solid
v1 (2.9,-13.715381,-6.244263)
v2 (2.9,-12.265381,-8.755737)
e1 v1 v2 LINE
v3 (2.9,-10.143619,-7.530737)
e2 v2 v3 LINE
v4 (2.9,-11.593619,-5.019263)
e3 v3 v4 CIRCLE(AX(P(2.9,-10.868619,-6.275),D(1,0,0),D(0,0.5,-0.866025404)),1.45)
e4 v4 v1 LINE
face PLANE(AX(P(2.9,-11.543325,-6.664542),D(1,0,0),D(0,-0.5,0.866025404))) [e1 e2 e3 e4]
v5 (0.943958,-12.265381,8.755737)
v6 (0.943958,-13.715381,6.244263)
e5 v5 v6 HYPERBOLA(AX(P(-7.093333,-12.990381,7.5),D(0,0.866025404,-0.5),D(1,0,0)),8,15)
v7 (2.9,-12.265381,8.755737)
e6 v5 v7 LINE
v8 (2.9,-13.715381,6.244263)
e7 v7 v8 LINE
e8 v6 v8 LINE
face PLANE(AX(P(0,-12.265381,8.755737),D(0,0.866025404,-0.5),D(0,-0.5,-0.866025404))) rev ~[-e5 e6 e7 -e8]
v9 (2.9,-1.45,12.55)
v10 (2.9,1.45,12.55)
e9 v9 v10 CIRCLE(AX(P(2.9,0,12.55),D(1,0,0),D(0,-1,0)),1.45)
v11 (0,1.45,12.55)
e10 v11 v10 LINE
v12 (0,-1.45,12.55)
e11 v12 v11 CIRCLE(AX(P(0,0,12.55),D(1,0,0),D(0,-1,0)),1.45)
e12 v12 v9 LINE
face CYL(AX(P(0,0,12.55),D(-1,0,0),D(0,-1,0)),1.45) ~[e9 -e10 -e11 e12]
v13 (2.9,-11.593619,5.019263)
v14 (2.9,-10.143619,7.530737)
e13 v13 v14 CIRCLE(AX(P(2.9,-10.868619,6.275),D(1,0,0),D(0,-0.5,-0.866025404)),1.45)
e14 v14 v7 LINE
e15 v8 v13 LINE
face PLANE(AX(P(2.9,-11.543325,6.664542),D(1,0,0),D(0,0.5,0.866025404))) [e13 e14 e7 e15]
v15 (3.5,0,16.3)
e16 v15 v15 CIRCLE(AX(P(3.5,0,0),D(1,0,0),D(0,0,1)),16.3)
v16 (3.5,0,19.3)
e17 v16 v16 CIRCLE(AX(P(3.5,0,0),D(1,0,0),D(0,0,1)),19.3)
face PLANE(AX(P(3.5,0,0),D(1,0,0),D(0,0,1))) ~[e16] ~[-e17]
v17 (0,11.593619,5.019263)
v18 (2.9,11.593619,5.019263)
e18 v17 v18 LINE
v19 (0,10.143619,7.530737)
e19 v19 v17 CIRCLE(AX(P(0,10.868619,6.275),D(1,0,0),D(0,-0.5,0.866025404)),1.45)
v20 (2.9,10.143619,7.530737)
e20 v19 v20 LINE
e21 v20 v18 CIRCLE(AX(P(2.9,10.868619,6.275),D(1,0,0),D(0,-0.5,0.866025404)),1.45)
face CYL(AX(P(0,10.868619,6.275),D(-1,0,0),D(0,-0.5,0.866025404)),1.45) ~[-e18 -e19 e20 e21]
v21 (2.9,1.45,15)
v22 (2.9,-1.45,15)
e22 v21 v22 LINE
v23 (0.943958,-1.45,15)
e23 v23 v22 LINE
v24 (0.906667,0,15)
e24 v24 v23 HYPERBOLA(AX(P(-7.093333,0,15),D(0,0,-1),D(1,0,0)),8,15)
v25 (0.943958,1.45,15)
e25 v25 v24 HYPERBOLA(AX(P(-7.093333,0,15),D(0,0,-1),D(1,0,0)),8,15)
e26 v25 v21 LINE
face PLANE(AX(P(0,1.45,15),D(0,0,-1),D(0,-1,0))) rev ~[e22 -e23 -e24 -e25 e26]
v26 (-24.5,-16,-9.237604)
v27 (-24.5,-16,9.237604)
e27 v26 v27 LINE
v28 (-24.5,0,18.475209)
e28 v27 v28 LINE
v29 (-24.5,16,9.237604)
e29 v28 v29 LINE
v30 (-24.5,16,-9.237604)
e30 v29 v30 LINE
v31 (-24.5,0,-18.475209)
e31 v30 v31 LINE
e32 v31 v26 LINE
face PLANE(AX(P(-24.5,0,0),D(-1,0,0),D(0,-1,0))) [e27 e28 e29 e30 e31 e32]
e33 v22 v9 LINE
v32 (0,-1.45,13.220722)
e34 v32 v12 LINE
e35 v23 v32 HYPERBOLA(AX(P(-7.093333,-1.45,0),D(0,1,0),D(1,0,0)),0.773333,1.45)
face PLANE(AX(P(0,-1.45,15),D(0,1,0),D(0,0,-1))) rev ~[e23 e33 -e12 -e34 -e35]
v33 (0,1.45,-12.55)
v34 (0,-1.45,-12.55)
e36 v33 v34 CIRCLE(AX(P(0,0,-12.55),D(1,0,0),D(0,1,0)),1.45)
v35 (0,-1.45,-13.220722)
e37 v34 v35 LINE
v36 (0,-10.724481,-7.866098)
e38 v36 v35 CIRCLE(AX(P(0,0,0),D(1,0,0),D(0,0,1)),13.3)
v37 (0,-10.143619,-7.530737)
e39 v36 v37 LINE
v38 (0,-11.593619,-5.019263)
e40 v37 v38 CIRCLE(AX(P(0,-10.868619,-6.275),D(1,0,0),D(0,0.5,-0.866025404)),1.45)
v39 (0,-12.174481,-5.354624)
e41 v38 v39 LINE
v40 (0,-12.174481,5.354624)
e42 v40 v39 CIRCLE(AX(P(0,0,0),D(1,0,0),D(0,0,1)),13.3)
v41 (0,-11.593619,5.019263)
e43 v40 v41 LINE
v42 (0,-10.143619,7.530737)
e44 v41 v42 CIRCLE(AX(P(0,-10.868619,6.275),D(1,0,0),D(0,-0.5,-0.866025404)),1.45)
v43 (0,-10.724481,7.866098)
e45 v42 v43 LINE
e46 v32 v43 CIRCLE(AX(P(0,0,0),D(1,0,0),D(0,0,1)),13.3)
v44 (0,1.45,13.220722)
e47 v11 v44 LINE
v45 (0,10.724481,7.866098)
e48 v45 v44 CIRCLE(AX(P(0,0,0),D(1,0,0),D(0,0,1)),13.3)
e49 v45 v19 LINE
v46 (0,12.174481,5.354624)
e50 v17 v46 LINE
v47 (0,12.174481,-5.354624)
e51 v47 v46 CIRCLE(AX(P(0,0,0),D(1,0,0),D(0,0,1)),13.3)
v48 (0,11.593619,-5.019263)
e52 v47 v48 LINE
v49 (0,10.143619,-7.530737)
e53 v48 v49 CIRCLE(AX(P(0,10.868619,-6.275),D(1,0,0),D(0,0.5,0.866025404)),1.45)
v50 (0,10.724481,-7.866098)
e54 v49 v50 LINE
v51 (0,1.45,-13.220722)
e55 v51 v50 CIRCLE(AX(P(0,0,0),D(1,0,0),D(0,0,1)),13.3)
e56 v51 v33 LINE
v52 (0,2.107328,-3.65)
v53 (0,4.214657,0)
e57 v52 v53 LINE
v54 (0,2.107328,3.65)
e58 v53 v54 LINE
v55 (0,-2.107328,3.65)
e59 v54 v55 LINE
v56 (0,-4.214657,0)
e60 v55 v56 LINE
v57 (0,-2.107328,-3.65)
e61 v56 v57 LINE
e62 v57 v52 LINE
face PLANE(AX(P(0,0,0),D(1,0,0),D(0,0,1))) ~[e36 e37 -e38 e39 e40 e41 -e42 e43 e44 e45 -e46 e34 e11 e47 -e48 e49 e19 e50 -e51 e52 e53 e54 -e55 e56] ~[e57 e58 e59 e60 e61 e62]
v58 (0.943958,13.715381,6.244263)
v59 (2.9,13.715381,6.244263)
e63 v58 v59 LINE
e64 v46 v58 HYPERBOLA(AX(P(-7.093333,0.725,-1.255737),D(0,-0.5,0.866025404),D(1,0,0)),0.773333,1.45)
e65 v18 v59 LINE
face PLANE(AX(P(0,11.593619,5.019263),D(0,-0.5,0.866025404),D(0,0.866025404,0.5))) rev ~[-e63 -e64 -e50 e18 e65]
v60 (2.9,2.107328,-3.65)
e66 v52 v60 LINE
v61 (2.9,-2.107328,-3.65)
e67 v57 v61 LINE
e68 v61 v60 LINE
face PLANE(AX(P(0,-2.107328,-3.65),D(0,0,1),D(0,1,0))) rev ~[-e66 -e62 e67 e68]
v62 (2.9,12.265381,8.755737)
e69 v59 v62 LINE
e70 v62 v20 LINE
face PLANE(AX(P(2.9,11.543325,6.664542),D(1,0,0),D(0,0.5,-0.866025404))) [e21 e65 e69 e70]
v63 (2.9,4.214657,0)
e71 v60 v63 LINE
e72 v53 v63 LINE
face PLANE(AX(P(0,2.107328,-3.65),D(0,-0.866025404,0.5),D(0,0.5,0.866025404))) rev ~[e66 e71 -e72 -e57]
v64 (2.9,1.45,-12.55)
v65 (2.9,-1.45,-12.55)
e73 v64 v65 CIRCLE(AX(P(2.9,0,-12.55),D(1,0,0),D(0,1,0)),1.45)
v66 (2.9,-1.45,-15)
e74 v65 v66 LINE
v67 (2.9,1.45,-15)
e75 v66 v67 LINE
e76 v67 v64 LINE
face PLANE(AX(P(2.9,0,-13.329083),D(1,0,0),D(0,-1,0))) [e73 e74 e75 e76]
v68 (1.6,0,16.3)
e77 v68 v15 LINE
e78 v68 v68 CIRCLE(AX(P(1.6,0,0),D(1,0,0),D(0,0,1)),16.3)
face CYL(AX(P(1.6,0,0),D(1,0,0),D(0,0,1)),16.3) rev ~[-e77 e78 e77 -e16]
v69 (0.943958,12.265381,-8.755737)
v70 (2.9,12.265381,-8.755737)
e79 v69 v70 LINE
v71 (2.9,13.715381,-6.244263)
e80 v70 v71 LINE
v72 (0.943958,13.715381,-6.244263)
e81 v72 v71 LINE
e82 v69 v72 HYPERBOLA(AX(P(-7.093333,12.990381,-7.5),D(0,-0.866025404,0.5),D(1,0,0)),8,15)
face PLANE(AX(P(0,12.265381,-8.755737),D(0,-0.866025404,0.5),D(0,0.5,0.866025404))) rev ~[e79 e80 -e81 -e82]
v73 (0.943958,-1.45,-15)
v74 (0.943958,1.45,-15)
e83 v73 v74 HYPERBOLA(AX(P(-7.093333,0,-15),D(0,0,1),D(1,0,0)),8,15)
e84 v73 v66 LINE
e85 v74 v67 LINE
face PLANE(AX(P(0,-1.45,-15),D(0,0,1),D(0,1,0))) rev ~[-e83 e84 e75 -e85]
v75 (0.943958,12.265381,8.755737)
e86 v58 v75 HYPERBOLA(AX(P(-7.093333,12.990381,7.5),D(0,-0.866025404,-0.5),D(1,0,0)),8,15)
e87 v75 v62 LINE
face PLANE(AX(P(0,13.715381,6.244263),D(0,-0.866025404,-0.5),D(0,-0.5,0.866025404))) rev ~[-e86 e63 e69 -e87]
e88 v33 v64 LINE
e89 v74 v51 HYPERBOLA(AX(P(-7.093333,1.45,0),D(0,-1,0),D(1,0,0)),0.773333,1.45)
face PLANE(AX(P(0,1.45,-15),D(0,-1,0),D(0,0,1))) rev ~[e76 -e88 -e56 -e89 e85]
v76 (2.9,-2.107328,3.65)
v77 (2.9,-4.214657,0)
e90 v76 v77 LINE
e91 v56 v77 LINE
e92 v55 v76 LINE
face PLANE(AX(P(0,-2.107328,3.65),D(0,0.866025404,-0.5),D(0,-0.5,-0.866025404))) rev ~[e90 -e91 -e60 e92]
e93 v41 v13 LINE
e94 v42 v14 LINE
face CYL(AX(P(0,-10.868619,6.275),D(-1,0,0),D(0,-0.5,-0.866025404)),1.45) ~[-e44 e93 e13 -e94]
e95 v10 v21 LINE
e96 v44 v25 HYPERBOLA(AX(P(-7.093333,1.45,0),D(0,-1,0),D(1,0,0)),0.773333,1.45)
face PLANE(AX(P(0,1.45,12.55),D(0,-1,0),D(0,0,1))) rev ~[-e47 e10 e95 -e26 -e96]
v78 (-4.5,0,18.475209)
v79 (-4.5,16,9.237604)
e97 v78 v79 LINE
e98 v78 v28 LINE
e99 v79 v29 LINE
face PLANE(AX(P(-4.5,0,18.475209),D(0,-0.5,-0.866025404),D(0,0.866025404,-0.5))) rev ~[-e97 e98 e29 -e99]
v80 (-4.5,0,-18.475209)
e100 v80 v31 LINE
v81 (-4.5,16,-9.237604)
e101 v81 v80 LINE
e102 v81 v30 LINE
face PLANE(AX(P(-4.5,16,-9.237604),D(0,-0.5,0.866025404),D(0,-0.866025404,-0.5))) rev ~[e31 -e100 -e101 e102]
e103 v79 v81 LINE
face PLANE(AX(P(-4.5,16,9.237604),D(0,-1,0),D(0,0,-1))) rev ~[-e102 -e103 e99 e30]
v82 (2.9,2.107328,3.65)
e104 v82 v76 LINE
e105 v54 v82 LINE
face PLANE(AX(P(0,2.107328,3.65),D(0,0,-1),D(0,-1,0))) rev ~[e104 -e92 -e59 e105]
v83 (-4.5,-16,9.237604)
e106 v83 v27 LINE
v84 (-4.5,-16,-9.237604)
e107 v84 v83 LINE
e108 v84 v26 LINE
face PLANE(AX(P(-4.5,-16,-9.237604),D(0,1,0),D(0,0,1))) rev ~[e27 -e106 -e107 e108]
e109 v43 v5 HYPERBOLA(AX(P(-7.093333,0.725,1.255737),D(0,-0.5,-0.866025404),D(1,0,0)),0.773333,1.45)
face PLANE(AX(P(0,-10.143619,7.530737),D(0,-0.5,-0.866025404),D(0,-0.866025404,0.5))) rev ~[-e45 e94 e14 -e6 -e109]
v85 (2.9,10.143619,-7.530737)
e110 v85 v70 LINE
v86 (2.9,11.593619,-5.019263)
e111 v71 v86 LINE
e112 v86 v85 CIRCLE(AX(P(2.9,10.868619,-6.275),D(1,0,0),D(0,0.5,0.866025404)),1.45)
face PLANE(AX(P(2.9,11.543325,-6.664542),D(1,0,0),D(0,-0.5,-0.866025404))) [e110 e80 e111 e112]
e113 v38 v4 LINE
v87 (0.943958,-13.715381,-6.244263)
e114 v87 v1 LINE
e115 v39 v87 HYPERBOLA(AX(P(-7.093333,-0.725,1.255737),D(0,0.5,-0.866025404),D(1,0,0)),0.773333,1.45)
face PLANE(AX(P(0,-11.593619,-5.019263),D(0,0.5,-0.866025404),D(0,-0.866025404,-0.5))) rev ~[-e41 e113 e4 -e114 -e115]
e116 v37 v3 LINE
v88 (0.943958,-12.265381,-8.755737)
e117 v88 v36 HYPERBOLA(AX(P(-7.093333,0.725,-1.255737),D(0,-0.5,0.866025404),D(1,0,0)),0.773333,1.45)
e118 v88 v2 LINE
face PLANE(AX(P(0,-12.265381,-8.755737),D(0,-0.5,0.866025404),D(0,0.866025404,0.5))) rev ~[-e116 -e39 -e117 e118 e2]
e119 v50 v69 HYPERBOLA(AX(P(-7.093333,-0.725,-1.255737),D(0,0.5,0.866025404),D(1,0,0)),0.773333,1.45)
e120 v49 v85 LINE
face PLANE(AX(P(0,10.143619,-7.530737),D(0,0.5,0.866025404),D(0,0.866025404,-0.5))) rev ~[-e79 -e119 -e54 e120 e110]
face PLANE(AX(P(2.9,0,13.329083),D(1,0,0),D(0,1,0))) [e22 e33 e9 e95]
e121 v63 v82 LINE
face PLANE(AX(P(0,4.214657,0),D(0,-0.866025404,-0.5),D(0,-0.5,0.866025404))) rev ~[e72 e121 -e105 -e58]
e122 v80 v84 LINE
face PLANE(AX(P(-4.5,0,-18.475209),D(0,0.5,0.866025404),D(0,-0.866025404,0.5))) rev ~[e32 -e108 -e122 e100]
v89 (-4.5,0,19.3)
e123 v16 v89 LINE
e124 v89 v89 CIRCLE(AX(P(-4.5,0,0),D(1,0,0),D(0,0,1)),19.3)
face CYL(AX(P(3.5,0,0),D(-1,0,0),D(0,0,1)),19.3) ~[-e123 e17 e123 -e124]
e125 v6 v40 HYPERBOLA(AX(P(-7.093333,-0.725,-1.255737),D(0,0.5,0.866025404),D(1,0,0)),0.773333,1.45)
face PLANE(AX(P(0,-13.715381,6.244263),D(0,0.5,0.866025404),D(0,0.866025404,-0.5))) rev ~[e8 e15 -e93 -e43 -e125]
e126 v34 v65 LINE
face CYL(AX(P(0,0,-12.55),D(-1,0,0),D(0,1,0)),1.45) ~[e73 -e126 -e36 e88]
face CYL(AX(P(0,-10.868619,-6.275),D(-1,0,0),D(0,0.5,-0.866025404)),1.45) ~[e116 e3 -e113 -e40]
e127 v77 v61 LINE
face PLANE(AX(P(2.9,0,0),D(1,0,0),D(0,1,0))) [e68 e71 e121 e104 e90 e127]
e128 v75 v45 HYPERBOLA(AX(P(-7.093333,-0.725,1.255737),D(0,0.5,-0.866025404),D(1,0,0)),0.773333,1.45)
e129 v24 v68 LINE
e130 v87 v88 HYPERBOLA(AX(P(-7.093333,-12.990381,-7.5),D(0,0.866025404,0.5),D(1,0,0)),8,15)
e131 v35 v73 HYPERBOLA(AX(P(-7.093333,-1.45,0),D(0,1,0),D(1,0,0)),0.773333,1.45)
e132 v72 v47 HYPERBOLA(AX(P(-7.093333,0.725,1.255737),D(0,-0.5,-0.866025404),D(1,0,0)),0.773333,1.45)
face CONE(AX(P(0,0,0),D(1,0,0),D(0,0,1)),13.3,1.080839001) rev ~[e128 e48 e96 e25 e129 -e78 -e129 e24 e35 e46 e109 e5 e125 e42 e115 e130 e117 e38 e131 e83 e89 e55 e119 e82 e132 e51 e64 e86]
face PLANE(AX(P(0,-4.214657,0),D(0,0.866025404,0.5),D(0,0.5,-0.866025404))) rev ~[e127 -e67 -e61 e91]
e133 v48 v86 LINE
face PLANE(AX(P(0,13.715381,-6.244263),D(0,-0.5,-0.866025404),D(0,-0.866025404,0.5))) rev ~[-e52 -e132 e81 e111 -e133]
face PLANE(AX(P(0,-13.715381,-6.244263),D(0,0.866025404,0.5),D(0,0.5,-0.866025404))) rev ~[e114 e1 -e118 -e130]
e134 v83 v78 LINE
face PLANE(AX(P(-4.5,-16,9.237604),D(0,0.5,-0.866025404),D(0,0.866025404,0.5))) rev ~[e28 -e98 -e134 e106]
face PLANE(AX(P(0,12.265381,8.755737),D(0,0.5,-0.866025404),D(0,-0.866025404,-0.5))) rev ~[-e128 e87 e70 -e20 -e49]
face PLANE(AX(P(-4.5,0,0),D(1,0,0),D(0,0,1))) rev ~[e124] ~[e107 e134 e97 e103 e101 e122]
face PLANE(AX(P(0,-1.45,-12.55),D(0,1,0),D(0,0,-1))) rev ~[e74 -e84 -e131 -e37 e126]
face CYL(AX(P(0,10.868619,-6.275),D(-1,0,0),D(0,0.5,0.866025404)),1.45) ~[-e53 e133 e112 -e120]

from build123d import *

# Parameters (mm, degrees)
F3_DEPTH        = 2.9
F5_DEPTH        = 20
F7_DEPTH        = 2.9
F7_COPIES_COUNT = 6


# Not quite as in the source:
# - a pattern or mirror of a feature is missing from the dataset's text; its kind, count and spacing are read off the source's solid


with BuildPart() as f1:
    # F0 (on Front) → F1 (revolve)
    with BuildSketch(Plane.XZ):
        Polygon((1.6, 16.3), (3.5, 16.3), (3.5, 19.3), (-4.5, 19.3), (-4.5, 0), (0, 0), (0, 13.3), align=None)
    revolve(axis=Axis((15.3209697455, 0, 0), (1, 0, 0)))

    # F2 (on face) → F3 (join)
    with BuildSketch(Plane.YZ):
        Polygon((-2.1073284825, 3.65), (-4.2146569651, 0), (-2.1073284825, -3.65), (2.1073284825, -3.65), (4.2146569651, 0), (2.1073284825, 3.65), align=None)
    extrude(amount=F3_DEPTH)

    # F4 (on face) → F5 (join)
    with BuildSketch(Plane(origin=(-4.5, 0, 0), x_dir=(0, -1, 0), z_dir=(-1, 0, 0))):
        Polygon((0, 18.4752086141), (-16, 9.237604307), (-16, -9.237604307), (0, -18.4752086141), (16, -9.237604307), (16, 9.237604307), align=None)
    extrude(amount=F5_DEPTH)

    # F6 (on face) → F7 (join)
    with BuildSketch(Plane.YZ):
        with BuildLine():
            Line((1.45, 15), (-1.45, 15))
            Line((-1.45, 15), (-1.45, 12.55))
            ThreePointArc((-1.45, 12.55), (0, 11.1), (1.45, 12.55))
            Line((1.45, 12.55), (1.45, 15))
        make_face()
    f7 = extrude(amount=F7_DEPTH)

    # F7_copies: F7 ×6 about axis
    f7_copies_axis = Axis((0, 0, 0), (1, 0, 0))
    for i in range(1, F7_COPIES_COUNT):
        add(f7.rotate(f7_copies_axis, i * 360 / F7_COPIES_COUNT))


solid = f1.part
